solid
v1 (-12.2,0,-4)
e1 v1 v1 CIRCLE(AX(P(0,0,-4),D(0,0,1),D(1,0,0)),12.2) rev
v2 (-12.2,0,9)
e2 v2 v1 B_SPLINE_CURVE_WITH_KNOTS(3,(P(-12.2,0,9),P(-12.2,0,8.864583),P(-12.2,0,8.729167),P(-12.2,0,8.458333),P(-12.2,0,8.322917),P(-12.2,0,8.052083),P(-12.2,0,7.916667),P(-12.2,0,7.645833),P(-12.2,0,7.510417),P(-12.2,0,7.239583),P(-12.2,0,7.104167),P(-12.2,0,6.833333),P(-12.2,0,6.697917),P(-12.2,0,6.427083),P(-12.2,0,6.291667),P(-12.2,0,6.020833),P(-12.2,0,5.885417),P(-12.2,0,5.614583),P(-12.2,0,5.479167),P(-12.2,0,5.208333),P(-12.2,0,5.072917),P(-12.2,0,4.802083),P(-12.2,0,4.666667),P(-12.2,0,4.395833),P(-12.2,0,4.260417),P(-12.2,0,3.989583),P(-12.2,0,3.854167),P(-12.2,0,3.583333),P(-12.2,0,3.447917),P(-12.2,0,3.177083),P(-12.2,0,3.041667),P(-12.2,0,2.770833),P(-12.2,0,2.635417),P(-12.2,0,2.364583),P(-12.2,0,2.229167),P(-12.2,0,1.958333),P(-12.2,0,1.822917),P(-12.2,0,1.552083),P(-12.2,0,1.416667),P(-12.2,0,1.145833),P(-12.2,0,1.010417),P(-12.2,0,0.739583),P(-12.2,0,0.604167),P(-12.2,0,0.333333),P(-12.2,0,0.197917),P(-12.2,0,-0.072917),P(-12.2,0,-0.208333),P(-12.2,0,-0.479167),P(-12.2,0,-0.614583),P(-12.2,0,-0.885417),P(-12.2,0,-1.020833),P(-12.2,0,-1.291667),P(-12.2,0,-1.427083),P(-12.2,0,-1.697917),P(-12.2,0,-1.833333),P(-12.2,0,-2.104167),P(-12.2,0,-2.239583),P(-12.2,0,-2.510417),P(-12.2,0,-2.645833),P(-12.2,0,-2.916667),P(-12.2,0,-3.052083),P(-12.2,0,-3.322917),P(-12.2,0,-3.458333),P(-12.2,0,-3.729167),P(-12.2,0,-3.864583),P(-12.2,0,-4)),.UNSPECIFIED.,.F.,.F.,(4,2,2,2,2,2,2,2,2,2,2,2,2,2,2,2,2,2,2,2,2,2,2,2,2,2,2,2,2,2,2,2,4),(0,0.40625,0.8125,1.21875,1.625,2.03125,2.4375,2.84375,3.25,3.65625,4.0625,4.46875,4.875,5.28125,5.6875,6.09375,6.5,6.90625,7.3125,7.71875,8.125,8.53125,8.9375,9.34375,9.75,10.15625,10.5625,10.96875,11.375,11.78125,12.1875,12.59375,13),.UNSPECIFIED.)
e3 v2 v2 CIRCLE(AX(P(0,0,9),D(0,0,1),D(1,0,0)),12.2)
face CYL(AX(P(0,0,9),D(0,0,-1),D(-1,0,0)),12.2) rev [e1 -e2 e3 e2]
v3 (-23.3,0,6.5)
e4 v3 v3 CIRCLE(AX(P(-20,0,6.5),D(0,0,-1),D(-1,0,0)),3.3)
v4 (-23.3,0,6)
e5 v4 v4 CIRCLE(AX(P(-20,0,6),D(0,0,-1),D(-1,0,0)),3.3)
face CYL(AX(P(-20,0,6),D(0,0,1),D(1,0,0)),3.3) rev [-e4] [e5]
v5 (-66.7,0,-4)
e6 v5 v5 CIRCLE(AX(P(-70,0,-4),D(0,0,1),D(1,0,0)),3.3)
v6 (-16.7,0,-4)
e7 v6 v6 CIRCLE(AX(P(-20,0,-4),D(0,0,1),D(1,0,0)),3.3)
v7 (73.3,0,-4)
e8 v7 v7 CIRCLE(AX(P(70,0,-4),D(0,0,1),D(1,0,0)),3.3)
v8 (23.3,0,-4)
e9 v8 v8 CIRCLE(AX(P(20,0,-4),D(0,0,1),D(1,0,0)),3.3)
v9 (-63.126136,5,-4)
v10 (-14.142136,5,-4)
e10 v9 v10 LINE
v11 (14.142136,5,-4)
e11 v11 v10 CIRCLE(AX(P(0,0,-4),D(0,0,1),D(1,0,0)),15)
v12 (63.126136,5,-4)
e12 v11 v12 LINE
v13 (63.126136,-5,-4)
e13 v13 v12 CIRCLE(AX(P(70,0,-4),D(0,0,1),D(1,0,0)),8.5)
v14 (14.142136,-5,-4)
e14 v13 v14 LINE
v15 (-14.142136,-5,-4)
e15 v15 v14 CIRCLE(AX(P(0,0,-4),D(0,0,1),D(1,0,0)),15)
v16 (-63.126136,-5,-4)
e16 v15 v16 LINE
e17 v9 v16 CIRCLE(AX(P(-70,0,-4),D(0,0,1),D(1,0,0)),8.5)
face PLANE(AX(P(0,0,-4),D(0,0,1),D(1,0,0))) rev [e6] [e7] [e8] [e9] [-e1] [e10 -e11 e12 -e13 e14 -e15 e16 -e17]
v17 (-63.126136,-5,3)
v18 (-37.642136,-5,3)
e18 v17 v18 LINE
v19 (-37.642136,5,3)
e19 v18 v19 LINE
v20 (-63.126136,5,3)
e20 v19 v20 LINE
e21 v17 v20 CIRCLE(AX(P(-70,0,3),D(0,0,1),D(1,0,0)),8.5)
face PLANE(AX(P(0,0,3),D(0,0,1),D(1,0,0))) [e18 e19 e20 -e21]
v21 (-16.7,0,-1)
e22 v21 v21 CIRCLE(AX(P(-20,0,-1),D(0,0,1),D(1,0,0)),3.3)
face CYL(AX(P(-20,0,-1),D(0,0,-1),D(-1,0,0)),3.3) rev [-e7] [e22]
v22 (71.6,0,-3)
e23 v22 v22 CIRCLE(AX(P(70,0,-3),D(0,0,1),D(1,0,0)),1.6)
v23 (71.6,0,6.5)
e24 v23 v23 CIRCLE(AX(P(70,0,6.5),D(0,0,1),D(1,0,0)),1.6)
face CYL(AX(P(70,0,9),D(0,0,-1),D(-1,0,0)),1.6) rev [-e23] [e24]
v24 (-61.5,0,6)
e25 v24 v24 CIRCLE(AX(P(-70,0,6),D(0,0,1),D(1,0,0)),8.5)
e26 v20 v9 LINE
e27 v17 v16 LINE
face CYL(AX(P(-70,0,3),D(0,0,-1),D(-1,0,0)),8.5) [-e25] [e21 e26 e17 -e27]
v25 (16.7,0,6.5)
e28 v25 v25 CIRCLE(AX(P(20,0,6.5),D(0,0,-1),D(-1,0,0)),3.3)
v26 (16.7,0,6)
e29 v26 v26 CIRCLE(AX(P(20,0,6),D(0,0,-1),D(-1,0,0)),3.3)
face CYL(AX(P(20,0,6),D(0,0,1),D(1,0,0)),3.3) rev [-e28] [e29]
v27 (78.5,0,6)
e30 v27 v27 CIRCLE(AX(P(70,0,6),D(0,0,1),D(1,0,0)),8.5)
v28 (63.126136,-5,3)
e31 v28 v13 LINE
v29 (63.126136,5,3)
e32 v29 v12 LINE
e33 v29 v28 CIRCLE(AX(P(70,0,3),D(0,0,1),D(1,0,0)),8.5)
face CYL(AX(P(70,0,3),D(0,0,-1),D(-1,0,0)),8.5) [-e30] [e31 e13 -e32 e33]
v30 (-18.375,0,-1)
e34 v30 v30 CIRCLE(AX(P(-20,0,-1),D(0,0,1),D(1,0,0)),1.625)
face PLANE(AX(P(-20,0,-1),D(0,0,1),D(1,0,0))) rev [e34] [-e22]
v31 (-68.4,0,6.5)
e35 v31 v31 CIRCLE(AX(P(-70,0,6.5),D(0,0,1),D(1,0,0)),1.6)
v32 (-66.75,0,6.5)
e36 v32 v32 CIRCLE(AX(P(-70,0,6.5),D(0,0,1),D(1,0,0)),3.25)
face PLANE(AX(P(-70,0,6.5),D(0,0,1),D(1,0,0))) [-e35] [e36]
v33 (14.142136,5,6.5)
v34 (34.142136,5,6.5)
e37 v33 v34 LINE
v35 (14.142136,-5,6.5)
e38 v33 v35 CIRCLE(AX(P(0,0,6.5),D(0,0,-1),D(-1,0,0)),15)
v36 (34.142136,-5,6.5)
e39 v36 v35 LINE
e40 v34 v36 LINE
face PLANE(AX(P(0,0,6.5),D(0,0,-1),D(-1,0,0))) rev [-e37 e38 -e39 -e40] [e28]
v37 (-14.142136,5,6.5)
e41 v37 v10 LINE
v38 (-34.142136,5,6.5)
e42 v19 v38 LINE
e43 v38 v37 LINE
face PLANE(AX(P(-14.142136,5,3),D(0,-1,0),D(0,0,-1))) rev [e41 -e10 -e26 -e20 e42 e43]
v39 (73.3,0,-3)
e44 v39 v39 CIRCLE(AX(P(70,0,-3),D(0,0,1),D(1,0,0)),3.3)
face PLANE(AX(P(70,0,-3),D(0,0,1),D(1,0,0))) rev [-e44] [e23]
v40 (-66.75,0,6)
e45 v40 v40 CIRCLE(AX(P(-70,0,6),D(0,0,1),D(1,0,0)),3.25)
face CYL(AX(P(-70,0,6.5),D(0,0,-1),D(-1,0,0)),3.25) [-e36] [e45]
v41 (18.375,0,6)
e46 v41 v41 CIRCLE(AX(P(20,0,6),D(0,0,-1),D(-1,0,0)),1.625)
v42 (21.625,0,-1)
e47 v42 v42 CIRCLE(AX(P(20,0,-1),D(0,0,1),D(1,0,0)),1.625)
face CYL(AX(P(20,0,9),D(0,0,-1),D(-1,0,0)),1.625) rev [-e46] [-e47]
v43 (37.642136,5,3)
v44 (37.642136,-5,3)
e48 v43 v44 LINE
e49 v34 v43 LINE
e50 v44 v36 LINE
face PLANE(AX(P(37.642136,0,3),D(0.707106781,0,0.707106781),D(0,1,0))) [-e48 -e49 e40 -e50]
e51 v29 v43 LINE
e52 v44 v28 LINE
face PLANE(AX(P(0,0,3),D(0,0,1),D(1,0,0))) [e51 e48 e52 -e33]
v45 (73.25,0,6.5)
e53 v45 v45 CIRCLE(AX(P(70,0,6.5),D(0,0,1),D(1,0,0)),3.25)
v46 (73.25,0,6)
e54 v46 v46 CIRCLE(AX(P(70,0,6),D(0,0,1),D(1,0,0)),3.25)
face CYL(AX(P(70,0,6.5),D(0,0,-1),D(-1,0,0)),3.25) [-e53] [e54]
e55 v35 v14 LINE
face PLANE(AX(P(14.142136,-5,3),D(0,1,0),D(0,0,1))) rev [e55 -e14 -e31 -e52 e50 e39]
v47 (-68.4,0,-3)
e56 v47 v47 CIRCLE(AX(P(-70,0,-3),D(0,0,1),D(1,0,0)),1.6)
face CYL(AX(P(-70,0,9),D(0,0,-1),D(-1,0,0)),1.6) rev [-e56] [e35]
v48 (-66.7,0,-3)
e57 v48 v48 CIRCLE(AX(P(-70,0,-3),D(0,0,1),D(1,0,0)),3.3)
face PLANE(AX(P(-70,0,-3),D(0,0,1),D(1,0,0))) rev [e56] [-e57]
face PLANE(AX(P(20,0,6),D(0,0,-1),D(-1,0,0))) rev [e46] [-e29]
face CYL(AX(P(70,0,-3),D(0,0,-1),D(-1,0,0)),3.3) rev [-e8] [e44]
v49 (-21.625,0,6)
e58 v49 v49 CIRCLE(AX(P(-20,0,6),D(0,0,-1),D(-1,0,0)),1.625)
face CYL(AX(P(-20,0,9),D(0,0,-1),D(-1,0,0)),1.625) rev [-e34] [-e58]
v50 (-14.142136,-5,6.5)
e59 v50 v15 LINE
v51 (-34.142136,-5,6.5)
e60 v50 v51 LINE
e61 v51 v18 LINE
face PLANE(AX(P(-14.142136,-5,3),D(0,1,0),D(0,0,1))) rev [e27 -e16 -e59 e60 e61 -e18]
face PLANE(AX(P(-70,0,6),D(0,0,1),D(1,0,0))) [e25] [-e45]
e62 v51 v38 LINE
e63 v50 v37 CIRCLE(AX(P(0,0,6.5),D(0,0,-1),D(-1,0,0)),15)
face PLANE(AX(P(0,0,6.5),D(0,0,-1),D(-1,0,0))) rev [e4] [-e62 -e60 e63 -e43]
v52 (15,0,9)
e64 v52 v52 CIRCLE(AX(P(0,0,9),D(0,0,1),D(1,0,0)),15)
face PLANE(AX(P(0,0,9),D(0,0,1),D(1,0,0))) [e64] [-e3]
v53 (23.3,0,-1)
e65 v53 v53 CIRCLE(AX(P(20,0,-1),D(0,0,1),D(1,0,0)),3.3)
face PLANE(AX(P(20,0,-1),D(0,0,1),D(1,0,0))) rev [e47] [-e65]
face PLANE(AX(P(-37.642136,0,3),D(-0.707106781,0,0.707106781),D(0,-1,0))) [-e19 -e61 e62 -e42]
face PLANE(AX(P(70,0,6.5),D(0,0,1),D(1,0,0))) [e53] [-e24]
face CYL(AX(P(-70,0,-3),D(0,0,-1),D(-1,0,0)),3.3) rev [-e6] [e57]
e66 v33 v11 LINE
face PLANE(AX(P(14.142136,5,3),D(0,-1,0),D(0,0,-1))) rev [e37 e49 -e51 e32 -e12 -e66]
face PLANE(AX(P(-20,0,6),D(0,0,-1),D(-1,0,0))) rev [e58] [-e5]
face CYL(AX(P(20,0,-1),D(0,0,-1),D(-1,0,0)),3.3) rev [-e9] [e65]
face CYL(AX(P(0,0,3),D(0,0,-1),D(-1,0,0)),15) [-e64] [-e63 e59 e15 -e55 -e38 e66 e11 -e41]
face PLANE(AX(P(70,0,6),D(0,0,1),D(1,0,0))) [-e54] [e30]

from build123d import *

# Parameters (mm, degrees)
SKETCH2_R               = 12
BOSS_EXTRUDE1_DEPTH     = 3
SKETCH3_R               = 15
SKETCH3_R_2             = 12
BOSS_EXTRUDE2_DEPTH     = 9
BOSS_EXTRUDE5_START     = 3
SKETCH6_R               = 8.5
BOSS_EXTRUDE5_DEPTH     = 3
BOSS_EXTRUDE6_START     = 3
SKETCH8_W               = 20
SKETCH8_H               = 10
BOSS_EXTRUDE6_DEPTH     = 3.5
CHAMFER2_SIZE           = 3.5
BOSS_EXTRUDE8_START     = -4
SKETCH14_R              = 12
BOSS_EXTRUDE8_DEPTH     = 4
CUT_EXTRUDE1_DEPTH      = 81.425431301
CUT_EXTRUDE1_DEPTH_BACK = 81.425431301
SKETCH7_R               = 1.625
CUT_EXTRUDE2_DEPTH      = 81.425431301
CUT_EXTRUDE2_DEPTH_BACK = 81.425431301
SKETCH4_R               = 1.6
CUT_EXTRUDE3_START      = 6.5
SKETCH9_R               = 3.3
CUT_EXTRUDE3_DEPTH      = 0.5
CUT_EXTRUDE4_START      = -4
SKETCH10_R              = 3.3
CUT_EXTRUDE4_DEPTH      = 1
CUT_EXTRUDE5_DEPTH      = 85.425431301
CUT_EXTRUDE5_DEPTH_BACK = 81.425431301
CUT_EXTRUDE5_START      = -4
SKETCH11_R              = 12.2
BOSS_EXTRUDE7_START     = 6
SKETCH12_R              = 3.25
SKETCH12_R_2            = 1.6
BOSS_EXTRUDE7_DEPTH     = 0.5
CUT_EXTRUDE6_START      = -1
SKETCH15_R              = 3.3
CUT_EXTRUDE6_DEPTH      = 3


with BuildPart() as part:
    # Sketch2 → Boss-Extrude1 (new body)
    with BuildSketch(Plane.XY):
        with BuildLine():
            Line((14.142135624, 5), (63.126136458, 5))
            ThreePointArc((63.126136458, 5), (78.5, 0), (63.126136458, -5))
            Line((63.126136458, -5), (14.142135624, -5))
            ThreePointArc((14.142135624, -5), (0, -15), (-14.142135624, -5))
            Line((-14.142135624, -5), (-63.126136458, -5))
            ThreePointArc((-63.126136458, -5), (-78.5, 0), (-63.126136458, 5))
            Line((-63.126136458, 5), (-14.142135624, 5))
            ThreePointArc((-14.142135624, 5), (0, 15), (14.142135624, 5))
        make_face()
        Circle(SKETCH2_R, mode=Mode.SUBTRACT)
    extrude(amount=BOSS_EXTRUDE1_DEPTH)

    # Sketch3 → Boss-Extrude2 (add)
    with BuildSketch(Plane.XY):
        with Locations(Location((0, 0, 0), (0, 0, 199.471220634))):
            Circle(SKETCH3_R)
        Circle(SKETCH3_R_2, mode=Mode.SUBTRACT)
    extrude(amount=BOSS_EXTRUDE2_DEPTH)

    # Sketch6 → Boss-Extrude5 (add)
    with BuildSketch(Plane.XY.offset(BOSS_EXTRUDE5_START)):
        with Locations(Location((-70, 0, 0), (0, 0, 36.031879072))):
            Circle(SKETCH6_R)
        with Locations(Location((70, 0, 0), (0, 0, 216.031879072))):
            Circle(SKETCH6_R)
    extrude(amount=BOSS_EXTRUDE5_DEPTH)

    # Sketch8 → Boss-Extrude6 (add)
    with BuildSketch(Plane.XY.offset(BOSS_EXTRUDE6_START)):
        with Locations((-24.142135624, 0)):
            Rectangle(SKETCH8_W, SKETCH8_H)
        with Locations((24.142135624, 0)):
            Rectangle(SKETCH8_W, SKETCH8_H)
    extrude(amount=BOSS_EXTRUDE6_DEPTH)

    # Chamfer2
    chamfer2_edges = [part.edges().sort_by_distance(p)[0] for p in [
        (-34.142135624, 0, 3),
        (34.142135624, 0, 3),
    ]]
    chamfer(chamfer2_edges, length=CHAMFER2_SIZE - 0.0001)  # a hair under: the kernel refuses the full size

    # Sketch14 → Boss-Extrude8 (add)
    with BuildSketch(Plane.XY.offset(BOSS_EXTRUDE8_START)):
        with BuildLine():
            Line((14.142135624, 5), (63.126136458, 5))
            ThreePointArc((63.126136458, 5), (78.5, 0), (63.126136458, -5))
            Line((63.126136458, -5), (14.142135624, -5))
            ThreePointArc((14.142135624, -5), (0, -15), (-14.142135624, -5))
            Line((-14.142135624, -5), (-63.126136458, -5))
            ThreePointArc((-63.126136458, -5), (-78.5, 0), (-63.126136458, 5))
            Line((-63.126136458, 5), (-14.142135624, 5))
            ThreePointArc((-14.142135624, 5), (0, 15), (14.142135624, 5))
        make_face()
        Circle(SKETCH14_R, mode=Mode.SUBTRACT)
    extrude(amount=BOSS_EXTRUDE8_DEPTH)

    # Sketch7 → Cut-Extrude1 (cut, two sides: drawn at the far end of the back side and taken through both)
    with BuildSketch(Plane.XY.offset(-CUT_EXTRUDE1_DEPTH_BACK)):
        with Locations(Location((-20, 0, 0), (0, 0, 180))):
            Circle(SKETCH7_R)
        with Locations(Location((20, 0, 0), (0, 0, 180))):
            Circle(SKETCH7_R)
    extrude(amount=CUT_EXTRUDE1_DEPTH + CUT_EXTRUDE1_DEPTH_BACK, mode=Mode.SUBTRACT)

    # Sketch4 → Cut-Extrude2 (cut, two sides: drawn at the far end of the back side and taken through both)
    with BuildSketch(Plane.XY.offset(-CUT_EXTRUDE2_DEPTH_BACK)):
        with Locations((-70, 0)):
            Circle(SKETCH4_R)
        with Locations((70, 0)):
            Circle(SKETCH4_R)
    extrude(amount=CUT_EXTRUDE2_DEPTH + CUT_EXTRUDE2_DEPTH_BACK, mode=Mode.SUBTRACT)

    # Sketch9 → Cut-Extrude3 (cut)
    with BuildSketch(Plane.XY.offset(CUT_EXTRUDE3_START)):
        with Locations(Location((-20, 0, 0), (0, 0, 180))):
            Circle(SKETCH9_R)
        with Locations(Location((20, 0, 0), (0, 0, 180))):
            Circle(SKETCH9_R)
    extrude(amount=-CUT_EXTRUDE3_DEPTH, mode=Mode.SUBTRACT)

    # Sketch10 → Cut-Extrude4 (cut)
    with BuildSketch(Plane.XY.offset(CUT_EXTRUDE4_START)):
        with Locations((-70, 0)):
            Circle(SKETCH10_R)
        with Locations((70, 0)):
            Circle(SKETCH10_R)
    extrude(amount=CUT_EXTRUDE4_DEPTH, mode=Mode.SUBTRACT)

    # Sketch11 → Cut-Extrude5 (cut, two sides: drawn at the far end of the back side and taken through both)
    with BuildSketch(Plane.XY.offset(CUT_EXTRUDE5_START - CUT_EXTRUDE5_DEPTH_BACK)):
        with Locations(Location((0, 0, 0), (0, 0, 180))):
            Circle(SKETCH11_R)
    extrude(amount=CUT_EXTRUDE5_DEPTH + CUT_EXTRUDE5_DEPTH_BACK, mode=Mode.SUBTRACT)

    # Sketch12 → Boss-Extrude7 (add)
    # profile 1 of 2: a face of its own
    with BuildSketch(Plane.XY.offset(BOSS_EXTRUDE7_START)):
        with Locations((-70, 0)):
            Circle(SKETCH12_R)
        with Locations((-70, 0)):
            Circle(SKETCH12_R_2, mode=Mode.SUBTRACT)
    # profile 2 of 2: a face of its own
    with BuildSketch(Plane.XY.offset(BOSS_EXTRUDE7_START)):
        with Locations((70, 0)):
            Circle(SKETCH12_R)
        with Locations((70, 0)):
            Circle(SKETCH12_R_2, mode=Mode.SUBTRACT)
    extrude(amount=BOSS_EXTRUDE7_DEPTH)

    # Sketch15 → Cut-Extrude6 (cut)
    with BuildSketch(Plane.XY.offset(CUT_EXTRUDE6_START)):
        with Locations(Location((-20, 0, 0), (0, 0, 180))):
            Circle(SKETCH15_R)
        with Locations(Location((20, 0, 0), (0, 0, 180))):
            Circle(SKETCH15_R)
    extrude(amount=-CUT_EXTRUDE6_DEPTH, mode=Mode.SUBTRACT)


solid = part.part
